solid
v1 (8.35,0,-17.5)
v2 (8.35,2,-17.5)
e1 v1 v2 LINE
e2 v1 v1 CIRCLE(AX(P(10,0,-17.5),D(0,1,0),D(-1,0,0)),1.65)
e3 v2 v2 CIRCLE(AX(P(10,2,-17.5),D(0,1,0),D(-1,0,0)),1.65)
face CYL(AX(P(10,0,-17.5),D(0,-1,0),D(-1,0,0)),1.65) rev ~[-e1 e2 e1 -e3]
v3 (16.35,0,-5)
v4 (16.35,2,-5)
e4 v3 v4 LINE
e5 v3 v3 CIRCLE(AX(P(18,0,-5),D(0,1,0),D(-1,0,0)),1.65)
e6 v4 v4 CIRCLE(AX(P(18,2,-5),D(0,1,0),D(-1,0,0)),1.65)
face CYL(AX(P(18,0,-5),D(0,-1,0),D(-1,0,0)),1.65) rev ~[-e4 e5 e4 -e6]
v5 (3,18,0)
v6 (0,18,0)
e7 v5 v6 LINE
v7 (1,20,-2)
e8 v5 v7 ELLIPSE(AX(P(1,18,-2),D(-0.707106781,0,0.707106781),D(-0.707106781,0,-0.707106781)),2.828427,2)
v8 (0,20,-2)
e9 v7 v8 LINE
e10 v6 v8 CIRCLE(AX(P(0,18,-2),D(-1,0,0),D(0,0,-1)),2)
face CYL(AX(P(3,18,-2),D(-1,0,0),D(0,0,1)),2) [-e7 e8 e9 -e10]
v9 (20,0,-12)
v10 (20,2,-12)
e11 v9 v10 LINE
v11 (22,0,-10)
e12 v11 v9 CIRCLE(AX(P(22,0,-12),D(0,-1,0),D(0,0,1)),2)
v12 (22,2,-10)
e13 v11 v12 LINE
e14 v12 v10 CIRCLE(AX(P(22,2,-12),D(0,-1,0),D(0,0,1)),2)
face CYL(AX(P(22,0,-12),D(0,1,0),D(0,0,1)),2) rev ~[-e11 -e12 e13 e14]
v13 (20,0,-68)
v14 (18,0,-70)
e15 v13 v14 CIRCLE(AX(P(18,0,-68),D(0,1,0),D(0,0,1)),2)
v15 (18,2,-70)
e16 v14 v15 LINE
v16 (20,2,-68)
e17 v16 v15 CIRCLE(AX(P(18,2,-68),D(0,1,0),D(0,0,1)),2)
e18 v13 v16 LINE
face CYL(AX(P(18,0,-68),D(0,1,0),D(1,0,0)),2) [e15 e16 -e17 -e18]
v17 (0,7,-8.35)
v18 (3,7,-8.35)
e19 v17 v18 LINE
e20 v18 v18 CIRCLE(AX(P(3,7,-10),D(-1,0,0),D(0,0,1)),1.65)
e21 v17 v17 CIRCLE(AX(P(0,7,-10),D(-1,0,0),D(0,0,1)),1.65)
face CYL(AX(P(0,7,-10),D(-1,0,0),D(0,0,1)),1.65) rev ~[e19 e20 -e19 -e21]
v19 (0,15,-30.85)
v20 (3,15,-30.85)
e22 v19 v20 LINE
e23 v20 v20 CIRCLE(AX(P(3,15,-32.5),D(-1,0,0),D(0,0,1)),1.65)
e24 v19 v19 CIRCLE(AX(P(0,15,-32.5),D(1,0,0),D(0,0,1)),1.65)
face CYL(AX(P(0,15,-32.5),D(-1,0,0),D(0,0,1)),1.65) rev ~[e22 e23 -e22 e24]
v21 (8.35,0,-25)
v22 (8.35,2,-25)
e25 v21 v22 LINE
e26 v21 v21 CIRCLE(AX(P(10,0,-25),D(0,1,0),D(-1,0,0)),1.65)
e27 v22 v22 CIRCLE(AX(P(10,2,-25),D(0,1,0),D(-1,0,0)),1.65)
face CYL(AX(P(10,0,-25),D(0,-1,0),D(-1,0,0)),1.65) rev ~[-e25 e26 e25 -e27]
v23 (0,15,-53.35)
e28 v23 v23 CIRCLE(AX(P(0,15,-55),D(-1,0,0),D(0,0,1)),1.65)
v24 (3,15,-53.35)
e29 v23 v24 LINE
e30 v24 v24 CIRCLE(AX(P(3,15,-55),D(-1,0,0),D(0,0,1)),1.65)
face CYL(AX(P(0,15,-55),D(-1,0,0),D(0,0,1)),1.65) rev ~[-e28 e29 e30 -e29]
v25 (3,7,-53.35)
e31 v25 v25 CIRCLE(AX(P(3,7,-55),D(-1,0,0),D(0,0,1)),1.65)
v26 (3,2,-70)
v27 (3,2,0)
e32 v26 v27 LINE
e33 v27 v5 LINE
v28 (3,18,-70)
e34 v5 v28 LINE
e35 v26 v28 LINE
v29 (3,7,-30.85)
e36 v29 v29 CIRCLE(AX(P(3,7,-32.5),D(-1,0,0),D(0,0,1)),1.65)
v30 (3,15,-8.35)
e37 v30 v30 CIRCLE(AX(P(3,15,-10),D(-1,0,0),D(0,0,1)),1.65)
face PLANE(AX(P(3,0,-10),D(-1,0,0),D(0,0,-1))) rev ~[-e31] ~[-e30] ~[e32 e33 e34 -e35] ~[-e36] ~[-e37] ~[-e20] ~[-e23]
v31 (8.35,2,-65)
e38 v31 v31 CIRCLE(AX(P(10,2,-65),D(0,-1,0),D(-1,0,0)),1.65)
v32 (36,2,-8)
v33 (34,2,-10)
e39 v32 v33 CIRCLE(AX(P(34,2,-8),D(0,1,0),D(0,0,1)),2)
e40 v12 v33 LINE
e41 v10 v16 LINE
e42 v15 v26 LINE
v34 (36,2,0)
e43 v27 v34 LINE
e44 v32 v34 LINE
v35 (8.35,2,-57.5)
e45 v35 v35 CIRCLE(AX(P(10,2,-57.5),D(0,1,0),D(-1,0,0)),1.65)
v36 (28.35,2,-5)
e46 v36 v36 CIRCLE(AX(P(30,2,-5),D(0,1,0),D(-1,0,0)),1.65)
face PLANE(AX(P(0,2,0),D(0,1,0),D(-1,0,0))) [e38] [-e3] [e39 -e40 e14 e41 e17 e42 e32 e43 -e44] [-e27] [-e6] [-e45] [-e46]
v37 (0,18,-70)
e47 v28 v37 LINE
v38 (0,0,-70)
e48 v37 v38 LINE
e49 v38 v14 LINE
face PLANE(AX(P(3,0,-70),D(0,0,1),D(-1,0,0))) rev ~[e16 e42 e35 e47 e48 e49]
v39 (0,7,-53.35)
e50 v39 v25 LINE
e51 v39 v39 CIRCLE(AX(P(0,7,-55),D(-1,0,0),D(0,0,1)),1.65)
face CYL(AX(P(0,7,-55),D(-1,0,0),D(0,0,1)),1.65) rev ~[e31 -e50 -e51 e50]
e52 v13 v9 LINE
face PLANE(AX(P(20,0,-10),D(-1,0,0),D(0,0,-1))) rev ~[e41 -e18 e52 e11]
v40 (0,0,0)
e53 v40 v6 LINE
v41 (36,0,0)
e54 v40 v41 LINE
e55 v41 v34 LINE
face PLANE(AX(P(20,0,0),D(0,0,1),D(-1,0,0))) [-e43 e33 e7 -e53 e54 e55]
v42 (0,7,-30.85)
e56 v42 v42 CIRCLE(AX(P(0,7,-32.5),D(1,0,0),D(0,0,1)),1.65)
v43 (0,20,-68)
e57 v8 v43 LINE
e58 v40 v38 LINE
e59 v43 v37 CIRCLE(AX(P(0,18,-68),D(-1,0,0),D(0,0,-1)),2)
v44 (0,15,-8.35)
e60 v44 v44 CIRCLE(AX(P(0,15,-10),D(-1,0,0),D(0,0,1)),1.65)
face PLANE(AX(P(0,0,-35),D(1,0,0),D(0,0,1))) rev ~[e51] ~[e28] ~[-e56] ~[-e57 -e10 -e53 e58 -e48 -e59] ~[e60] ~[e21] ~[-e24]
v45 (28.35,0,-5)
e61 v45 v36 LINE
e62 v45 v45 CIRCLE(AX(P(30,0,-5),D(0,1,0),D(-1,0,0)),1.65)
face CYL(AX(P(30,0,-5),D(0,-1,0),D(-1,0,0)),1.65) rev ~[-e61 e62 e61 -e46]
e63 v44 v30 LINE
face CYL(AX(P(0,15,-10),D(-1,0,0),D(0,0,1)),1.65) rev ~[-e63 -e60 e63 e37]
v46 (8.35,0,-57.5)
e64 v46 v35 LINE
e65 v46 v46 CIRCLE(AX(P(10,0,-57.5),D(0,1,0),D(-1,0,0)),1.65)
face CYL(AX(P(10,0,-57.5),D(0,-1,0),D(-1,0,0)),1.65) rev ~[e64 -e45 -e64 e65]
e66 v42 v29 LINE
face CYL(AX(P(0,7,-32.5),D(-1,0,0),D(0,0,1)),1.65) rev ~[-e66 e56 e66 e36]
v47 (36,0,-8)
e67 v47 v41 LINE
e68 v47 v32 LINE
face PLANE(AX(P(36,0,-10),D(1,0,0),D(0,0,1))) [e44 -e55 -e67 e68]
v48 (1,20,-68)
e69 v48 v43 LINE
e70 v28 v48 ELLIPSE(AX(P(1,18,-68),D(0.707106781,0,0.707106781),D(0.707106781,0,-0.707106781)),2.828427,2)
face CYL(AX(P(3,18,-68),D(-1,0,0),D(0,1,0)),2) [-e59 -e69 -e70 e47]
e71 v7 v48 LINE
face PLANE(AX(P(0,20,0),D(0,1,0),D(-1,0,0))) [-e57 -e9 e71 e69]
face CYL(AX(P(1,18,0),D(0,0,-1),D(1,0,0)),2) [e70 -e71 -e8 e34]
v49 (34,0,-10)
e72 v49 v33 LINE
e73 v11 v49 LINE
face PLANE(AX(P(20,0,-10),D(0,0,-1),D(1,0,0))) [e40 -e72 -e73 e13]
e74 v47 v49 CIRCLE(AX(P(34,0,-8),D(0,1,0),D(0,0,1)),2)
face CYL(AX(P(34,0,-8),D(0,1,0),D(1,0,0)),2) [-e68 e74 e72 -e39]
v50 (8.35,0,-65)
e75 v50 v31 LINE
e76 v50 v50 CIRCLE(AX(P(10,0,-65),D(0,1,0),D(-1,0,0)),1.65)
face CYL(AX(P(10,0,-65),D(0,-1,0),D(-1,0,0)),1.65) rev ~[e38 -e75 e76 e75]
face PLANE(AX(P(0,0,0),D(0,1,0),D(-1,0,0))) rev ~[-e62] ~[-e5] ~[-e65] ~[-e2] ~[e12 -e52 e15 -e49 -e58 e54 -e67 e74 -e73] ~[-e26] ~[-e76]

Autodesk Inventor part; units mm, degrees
ref_plane "YZ Plane" through (0, 0, 0) normal (1, 0, 0) x (0, 1, 0)
ref_plane "XZ Plane" through (0, 0, 0) normal (0, 1, 0) x (-1, 0, 0)
ref_plane "XY Plane" through (0, 0, 0) normal (0, 0, 1) x (1, 0, 0)
sketch "Sketch1" plane through (0, 0, 0) normal (0, 1, 0) x (-1, 0, 0)
  circle A0 centre (-18, -5) radius 1.65
  line L0 (0, -10) -> (-36, -10)
  line L1 (-36, 0) -> (0, 0)
  line L2 (0, -10) -> (-36, 0) construction
  line L3 (-36, -10) -> (0, 0) construction
  circle A1 centre (-10, -17.5) radius 1.65
  line L4 (0, 0) -> (0, -10)
  line L5 (-20, 0) -> (-20, -35)
  line L6 (0, -35) -> (0, 0)
  line L7 (0, -35) -> (-20, 0) construction
  line L8 (-20, -35) -> (0, 0) construction
  line L9 (-3, 0) -> (-3, -65)
  line L10 (0, -65) -> (0, 0)
  line L11 (0, 0) -> (-3, 0)
  line L12 (0, 0) -> (-20, 0)
  circle A2 centre (-10, -57.5) radius 1.65
  line L13 (-20, -35) -> (0, -35)
  line L14 (-20, -35) -> (0, -35)
  line L15 (0, -65) -> (-20, -65)
  line L16 (-20, -65) -> (-20, -35)
  line L17 (-3, -65) -> (0, -65)
  line L18 (0, -35) -> (0, -65)
  circle A3 centre (-30, -5) radius 1.65
  line L19 (-36, -10) -> (-36, 0)
  circle A4 centre (-10, -25) radius 1.65
  circle A5 centre (-10, -65) radius 1.65
  line L20 (0, -65) -> (-20, -65)
  line L21 (-20, -65) -> (-20, -70)
  line L22 (-20, -70) -> (0, -70)
  line L23 (0, -70) -> (0, -65)
  line L24 (-3, -65) -> (-3, -70)
  point P0 (0, 0)
  point P1 (-20, -10)
  point P2 (-18, -5)
  point P3 (-11.65, -65)
  point P4 (-8.35, -65)
  dimension "d22" = 3.3
  dimension "d23" = 20
  dimension "d24" = 3.3
  dimension "d25" = 40
  dimension "d26" = 5
extrude "Extrusion1" add sketch "Sketch1" along normal blind 2 contours L9 L13 L5 L0 | L0 L5 L1 L9 | L0 L19 L1 L5 | L9 L15 A5 L16 L13 | L23 L22 L24 L15 | L24 L22 L21 L15 A5
extrude "Extrusion2" add sketch "Sketch1" along normal blind 20 contours L6 L13 L9 L0 | L0 L9 L1 L4 | L10 L15 L9 L13 | L23 L22 L24 L15
sketch "Sketch3" plane through (0, 0, -70) normal (-1, 0, 0) x (0, 0, 1)
  circle A0 centre (60, 15) radius 1.65
  line L0 (0, 20) -> (70, 20) projected
  line L1 (70, 0) -> (70, 20) projected
  circle A1 centre (37.5, 15) radius 1.65
  line L2 (37.5, 15) -> (37.5, 0)
  circle A2 centre (60, 7) radius 1.65
  circle A3 centre (15, 15) radius 1.65
  circle A4 centre (15, 7) radius 1.65
  circle A5 centre (37.5, 7) radius 1.65
  dimension "d27" = 3.3
  dimension "d28" = 5
  dimension "d29" = 10
  dimension "d30" = 3.3
  dimension "d31" = 22.5
  dimension "d32" = 3.3
  dimension "d33" = 8
  dimension "d34" = 3.3
extrude "Extrusion4" cut sketch "Sketch3" against normal blind 20
fillet "Fillet1" radius 2 6 edges at (36, 1, -10) (20, 1, -10) (20, 1, -70) (3, 20, -35) (1.5, 20, 0) (1.5, 20, -70)
properties part number "Holder Conveyor Kanan_3DPrint"
